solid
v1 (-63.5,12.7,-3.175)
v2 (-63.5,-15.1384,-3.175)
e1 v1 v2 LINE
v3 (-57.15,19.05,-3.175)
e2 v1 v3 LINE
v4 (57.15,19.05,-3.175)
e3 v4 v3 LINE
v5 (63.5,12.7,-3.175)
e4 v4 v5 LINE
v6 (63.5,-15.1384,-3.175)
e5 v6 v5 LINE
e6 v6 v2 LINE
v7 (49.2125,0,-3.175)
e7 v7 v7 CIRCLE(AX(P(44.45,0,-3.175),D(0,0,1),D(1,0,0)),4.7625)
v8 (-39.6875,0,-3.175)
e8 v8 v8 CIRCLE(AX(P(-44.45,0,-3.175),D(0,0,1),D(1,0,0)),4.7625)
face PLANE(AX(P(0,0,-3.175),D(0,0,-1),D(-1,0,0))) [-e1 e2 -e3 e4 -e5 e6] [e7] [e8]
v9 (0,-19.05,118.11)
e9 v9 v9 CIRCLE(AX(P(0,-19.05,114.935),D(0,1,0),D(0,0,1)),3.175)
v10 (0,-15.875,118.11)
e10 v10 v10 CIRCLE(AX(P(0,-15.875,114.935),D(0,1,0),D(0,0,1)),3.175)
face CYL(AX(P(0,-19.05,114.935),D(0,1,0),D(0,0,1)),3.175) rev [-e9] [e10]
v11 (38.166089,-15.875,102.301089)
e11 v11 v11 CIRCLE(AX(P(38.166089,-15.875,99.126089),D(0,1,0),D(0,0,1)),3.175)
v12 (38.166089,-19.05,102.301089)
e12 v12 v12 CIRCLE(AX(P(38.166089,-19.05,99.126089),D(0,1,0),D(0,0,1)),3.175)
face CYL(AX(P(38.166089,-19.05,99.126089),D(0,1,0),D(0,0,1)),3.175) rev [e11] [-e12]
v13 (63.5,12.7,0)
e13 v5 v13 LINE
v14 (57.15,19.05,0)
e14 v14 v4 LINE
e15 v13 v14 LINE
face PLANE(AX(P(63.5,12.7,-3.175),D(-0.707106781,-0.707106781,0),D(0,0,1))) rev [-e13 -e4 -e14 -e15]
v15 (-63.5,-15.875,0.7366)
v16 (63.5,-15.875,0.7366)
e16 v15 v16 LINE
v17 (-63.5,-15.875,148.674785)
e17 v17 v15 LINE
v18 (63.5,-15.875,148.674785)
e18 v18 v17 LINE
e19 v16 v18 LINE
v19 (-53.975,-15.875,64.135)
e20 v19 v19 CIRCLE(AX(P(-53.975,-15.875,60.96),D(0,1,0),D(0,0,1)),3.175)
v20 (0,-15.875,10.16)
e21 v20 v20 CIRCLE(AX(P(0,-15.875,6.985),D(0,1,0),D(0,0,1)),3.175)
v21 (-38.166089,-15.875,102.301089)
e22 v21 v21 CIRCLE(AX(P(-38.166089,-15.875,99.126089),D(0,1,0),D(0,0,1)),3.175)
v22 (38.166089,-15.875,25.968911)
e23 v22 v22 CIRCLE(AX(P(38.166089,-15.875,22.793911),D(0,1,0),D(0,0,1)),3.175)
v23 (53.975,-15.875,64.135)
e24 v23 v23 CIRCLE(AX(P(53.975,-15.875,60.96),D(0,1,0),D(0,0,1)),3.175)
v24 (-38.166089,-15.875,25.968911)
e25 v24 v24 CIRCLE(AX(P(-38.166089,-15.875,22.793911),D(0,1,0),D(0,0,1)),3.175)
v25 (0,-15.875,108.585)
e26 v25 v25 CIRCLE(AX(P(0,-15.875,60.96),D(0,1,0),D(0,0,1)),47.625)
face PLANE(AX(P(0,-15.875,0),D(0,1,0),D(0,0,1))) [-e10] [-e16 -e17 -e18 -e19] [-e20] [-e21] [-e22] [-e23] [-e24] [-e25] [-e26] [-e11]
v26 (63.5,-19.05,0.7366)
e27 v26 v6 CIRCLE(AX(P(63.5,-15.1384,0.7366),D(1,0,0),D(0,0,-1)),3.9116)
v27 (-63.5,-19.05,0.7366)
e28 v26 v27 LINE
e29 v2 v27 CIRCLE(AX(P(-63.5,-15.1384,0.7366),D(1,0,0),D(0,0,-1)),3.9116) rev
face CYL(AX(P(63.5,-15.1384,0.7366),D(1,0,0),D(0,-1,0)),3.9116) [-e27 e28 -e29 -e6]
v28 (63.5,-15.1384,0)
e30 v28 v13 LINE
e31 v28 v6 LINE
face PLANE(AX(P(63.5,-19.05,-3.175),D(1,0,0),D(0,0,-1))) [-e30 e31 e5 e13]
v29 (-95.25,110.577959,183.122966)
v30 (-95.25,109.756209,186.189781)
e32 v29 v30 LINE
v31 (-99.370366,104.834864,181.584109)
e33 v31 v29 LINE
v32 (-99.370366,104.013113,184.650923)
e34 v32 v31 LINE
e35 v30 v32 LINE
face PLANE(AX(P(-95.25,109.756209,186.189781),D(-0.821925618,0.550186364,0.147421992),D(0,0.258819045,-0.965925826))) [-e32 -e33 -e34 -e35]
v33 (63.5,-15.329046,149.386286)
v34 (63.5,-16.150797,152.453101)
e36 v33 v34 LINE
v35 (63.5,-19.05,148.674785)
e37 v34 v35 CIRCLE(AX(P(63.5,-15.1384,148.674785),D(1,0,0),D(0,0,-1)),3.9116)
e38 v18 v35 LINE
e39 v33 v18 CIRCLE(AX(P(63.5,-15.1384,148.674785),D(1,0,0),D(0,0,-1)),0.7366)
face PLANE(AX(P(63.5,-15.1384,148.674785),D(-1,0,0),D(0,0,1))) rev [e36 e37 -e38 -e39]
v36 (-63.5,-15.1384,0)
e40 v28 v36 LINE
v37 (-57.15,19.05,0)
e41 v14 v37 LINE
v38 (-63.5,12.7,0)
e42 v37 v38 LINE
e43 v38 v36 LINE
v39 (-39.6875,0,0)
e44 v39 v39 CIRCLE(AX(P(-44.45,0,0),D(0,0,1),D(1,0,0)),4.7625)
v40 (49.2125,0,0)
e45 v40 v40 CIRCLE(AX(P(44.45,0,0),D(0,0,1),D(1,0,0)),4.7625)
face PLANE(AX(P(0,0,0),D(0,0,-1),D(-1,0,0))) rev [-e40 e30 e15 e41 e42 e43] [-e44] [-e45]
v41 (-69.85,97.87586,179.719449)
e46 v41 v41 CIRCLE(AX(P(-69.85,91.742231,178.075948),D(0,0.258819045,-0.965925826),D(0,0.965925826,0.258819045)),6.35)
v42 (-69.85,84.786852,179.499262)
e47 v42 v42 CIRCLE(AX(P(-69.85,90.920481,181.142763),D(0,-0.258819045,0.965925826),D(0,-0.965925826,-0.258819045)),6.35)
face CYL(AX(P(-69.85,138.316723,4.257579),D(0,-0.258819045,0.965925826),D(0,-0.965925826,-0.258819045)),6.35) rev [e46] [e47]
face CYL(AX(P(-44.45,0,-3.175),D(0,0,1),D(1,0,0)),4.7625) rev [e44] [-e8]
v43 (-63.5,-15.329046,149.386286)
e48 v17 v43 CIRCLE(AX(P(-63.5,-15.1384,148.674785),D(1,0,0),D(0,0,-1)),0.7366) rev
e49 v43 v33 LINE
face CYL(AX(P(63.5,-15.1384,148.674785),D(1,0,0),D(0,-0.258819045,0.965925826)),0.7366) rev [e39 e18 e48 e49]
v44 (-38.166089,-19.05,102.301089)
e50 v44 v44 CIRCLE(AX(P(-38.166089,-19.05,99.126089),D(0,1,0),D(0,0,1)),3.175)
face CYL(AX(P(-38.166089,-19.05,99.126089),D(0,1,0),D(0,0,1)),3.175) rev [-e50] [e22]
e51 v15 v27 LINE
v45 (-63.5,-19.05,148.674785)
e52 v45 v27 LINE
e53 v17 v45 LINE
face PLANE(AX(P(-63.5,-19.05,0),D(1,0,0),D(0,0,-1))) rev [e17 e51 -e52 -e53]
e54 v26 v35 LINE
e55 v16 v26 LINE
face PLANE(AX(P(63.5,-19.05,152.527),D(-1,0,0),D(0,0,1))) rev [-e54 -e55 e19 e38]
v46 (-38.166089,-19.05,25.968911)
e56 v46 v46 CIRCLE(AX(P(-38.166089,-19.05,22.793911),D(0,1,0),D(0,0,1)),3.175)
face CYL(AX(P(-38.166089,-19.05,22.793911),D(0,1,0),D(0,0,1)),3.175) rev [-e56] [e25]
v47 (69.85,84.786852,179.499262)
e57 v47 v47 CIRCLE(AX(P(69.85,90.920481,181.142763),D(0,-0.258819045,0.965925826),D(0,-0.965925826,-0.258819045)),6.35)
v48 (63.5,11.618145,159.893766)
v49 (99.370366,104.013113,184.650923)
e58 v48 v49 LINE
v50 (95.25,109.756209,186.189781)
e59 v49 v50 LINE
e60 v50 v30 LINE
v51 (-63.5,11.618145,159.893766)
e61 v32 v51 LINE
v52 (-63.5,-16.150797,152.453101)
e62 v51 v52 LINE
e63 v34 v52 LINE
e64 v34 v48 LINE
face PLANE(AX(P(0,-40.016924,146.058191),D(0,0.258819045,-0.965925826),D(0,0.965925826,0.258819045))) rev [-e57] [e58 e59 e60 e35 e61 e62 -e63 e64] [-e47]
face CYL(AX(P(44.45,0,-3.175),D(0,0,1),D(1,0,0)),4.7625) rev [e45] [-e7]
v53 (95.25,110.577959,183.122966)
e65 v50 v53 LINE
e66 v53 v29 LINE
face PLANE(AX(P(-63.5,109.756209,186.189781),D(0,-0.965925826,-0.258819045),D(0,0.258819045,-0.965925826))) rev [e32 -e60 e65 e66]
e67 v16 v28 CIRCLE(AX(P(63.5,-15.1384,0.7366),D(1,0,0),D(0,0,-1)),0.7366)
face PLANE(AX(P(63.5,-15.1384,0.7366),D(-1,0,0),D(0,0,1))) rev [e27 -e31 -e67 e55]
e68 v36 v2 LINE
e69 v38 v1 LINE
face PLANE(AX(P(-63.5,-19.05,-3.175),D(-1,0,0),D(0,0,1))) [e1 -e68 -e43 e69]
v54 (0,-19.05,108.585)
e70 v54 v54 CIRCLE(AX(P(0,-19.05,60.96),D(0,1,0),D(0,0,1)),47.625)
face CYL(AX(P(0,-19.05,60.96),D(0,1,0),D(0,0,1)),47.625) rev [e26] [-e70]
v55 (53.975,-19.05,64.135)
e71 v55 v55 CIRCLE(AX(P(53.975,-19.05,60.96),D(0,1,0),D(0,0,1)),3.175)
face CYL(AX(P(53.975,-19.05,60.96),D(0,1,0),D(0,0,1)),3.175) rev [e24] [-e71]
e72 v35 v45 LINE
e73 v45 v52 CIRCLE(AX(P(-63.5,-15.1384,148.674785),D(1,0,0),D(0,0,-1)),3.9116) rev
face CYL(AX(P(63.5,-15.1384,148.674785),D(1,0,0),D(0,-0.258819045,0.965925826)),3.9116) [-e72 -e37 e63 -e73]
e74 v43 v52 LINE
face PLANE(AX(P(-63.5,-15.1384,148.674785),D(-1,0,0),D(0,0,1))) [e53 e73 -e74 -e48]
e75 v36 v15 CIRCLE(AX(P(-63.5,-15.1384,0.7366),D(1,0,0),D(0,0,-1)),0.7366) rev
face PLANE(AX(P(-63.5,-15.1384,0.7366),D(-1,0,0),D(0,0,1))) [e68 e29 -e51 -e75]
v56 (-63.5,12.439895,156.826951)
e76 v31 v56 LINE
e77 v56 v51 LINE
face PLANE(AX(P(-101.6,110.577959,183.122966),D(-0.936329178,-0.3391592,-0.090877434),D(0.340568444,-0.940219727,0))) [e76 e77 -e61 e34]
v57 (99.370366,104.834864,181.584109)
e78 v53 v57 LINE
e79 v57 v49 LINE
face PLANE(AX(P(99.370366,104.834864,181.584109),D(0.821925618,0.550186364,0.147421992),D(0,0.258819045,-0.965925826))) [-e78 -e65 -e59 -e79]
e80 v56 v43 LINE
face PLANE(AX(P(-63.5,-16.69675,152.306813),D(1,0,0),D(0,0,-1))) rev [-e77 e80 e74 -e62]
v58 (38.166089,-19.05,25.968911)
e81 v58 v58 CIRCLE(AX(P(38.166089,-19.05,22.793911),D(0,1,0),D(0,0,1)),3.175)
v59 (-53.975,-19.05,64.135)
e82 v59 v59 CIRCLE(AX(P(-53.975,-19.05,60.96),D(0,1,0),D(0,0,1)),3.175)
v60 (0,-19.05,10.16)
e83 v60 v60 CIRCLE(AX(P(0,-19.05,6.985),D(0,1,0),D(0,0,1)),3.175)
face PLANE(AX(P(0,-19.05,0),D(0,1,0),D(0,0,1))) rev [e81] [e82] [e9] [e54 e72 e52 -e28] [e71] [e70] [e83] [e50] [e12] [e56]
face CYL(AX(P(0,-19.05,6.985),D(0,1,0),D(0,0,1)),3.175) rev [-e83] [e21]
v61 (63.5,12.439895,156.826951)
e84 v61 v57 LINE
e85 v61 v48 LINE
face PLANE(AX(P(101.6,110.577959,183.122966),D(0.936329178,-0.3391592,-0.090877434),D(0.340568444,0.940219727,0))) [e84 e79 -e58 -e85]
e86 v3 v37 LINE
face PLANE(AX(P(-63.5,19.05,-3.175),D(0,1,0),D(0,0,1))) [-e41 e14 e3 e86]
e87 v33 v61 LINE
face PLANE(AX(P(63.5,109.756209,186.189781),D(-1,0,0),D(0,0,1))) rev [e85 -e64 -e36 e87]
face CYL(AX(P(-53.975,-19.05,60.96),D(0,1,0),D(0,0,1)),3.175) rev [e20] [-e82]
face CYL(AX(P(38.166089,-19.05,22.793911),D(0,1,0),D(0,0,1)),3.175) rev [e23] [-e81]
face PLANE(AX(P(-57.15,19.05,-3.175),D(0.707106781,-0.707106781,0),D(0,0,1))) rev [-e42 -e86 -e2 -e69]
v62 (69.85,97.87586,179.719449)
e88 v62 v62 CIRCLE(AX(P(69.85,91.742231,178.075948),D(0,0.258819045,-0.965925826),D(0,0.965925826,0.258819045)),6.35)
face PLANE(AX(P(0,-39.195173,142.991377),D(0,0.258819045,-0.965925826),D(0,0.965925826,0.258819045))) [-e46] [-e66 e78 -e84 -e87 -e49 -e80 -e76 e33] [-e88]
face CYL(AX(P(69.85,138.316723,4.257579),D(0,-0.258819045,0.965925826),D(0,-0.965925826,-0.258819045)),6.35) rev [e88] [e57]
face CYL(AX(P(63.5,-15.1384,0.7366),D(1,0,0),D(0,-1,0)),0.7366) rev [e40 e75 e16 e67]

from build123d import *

# Parameters (mm, degrees)
SKETCH1_W                    = 127
SKETCH1_H                    = 38.1
BASE_FLANGE1_DEPTH           = 3.175
EDGE_FLANGE1_STRIP_W         = 14.1732
EDGE_FLANGE1_STRIP_H         = 3.175
EDGE_FLANGE1_STRIP_CUT_DEPTH = 127
EDGE_FLANGE1_DEPTH           = 127
SKETCH9_R                    = 3.175
SKETCH9_R_2                  = 47.625
CUT_EXTRUDE1_DEPTH           = 169.868266273
EDGE_FLANGE2_START           = -63.5
EDGE_FLANGE2_DEPTH           = 127
EDGE_FLANGE2_2_DEPTH         = 127
TAB1_DEPTH                   = 3.175
SKETCH16_R                   = 6.35
CUT_EXTRUDE2_DEPTH           = 235.714429908
BREAK_CORNER1_START          = -171.342480702
BREAK_CORNER1_OUTLINE_W      = 10
BREAK_CORNER1_OUTLINE_H      = 6
BREAK_CORNER1_DEPTH          = 5.219227672
BREAK_CORNER1_START_2        = 166.12325303
BREAK_CORNER1_2_OUTLINE_W    = 10
BREAK_CORNER1_2_OUTLINE_H    = 6
BREAK_CORNER1_2_DEPTH        = 5.219227672
BREAK_CORNER1_START_3        = 53.881536726
BREAK_CORNER1_3_OUTLINE_W    = 12
BREAK_CORNER1_3_OUTLINE_H    = 6
BREAK_CORNER1_3_DEPTH        = 4.490128061
BREAK_CORNER1_START_4        = -58.371664787
BREAK_CORNER1_4_OUTLINE_W    = 12
BREAK_CORNER1_4_OUTLINE_H    = 6
BREAK_CORNER1_4_DEPTH        = 4.490128061
SKETCH17_R                   = 4.7625
CUT_EXTRUDE3_DEPTH           = 239.261598489


# Read off the part's stored shape, not the designer's step: Edge-Flange2, Break-Corner1
# Sheet-metal steps are written as plain solids
with BuildPart() as part:
    # Sketch1 → Base-Flange1 (new body)
    with BuildSketch(Plane.XY):
        Rectangle(SKETCH1_W, SKETCH1_H)
    extrude(amount=-BASE_FLANGE1_DEPTH)

    # Edge-Flange1 strip (across the edge) → Edge-Flange1 strip cut (cut)
    with BuildSketch(Plane(origin=(-63.5, -19.05, 0), x_dir=(0, 1, 0), z_dir=(1, 0, 0))):
        with Locations((-3.175, -1.5875)):
            Rectangle(EDGE_FLANGE1_STRIP_W, EDGE_FLANGE1_STRIP_H)
    extrude(amount=EDGE_FLANGE1_STRIP_CUT_DEPTH, mode=Mode.SUBTRACT)

    # Edge-Flange1 section (across the edge) → Edge-Flange1 (add)
    with BuildSketch(Plane(origin=(-63.5, -19.05, 0), x_dir=(0, 1, 0), z_dir=(1, 0, 0))):
        with BuildLine():
            Line((0, 0.7366), (0, 152.527))
            Line((0, 152.527), (3.175, 152.527))
            Line((3.175, 152.527), (3.175, 0.7366))
            ThreePointArc((3.175, 0.7366), (3.390745145, 0.215745145), (3.9116, 0))
            Line((3.9116, 0), (3.9116, -3.175))
            ThreePointArc((3.9116, -3.175), (1.145681115, -2.029318885), (0, 0.7366))
        make_face()
    extrude(amount=EDGE_FLANGE1_DEPTH)

    # Sketch9 → Cut-Extrude1 (cut, through all)
    with BuildSketch(Plane(origin=(0, -15.875, 0), x_dir=(1, 0, 0), z_dir=(0, 1, 0))):
        with Locations(Location((0, -6.985, 0), (0, 0, 270))):
            Circle(SKETCH9_R)
        with Locations(Location((38.166088515, -22.793911485, 0), (0, 0, 270))):
            Circle(SKETCH9_R)
        with Locations(Location((53.975, -60.96, 0), (0, 0, 270))):
            Circle(SKETCH9_R)
        with Locations(Location((38.166088515, -99.126088515, 0), (0, 0, 270))):
            Circle(SKETCH9_R)
        with Locations(Location((0, -114.935, 0), (0, 0, 270))):
            Circle(SKETCH9_R)
        with Locations(Location((-38.166088515, -99.126088515, 0), (0, 0, 270))):
            Circle(SKETCH9_R)
        with Locations(Location((-53.975, -60.96, 0), (0, 0, 270))):
            Circle(SKETCH9_R)
        with Locations(Location((-38.166088515, -22.793911485, 0), (0, 0, 270))):
            Circle(SKETCH9_R)
        with Locations(Location((0, -60.96, 0), (0, 0, 270))):
            Circle(SKETCH9_R_2)
    extrude(amount=-CUT_EXTRUDE1_DEPTH, mode=Mode.SUBTRACT)

    # Edge-Flange2 outline → Edge-Flange2 (cut)
    with BuildSketch(Plane.YZ.offset(EDGE_FLANGE2_START)):
        with BuildLine():
            ThreePointArc((-19.05, 148.674785068), (-18.241680926, 151.056016274), (-16.150796577, 152.45310053))
            Line((-16.150796577, 152.45310053), (-15.875, 152.527))
            Line((-15.875, 152.527), (-19.05, 152.527))
            Line((-19.05, 152.527), (-19.05, 148.674785068))
        make_face()
    extrude(amount=EDGE_FLANGE2_DEPTH, mode=Mode.SUBTRACT)

    # Edge-Flange2 2 outline → Edge-Flange2 2 (add)
    with BuildSketch(Plane.YZ.offset(EDGE_FLANGE2_START)):
        with BuildLine():
            Line((109.756208936, 186.189780978), (-15.875, 152.527))
            Line((-15.875, 152.527), (-15.875, 148.674785068))
            ThreePointArc((-15.875, 148.674785068), (-15.72278407, 149.123198736), (-15.329046109, 149.386286031))
            Line((-15.329046109, 149.386286031), (110.577959404, 183.12296648))
            Line((110.577959404, 183.12296648), (109.756208936, 186.189780978))
        make_face()
    extrude(amount=EDGE_FLANGE2_2_DEPTH)

    # Sketch13 → Tab1 (add)
    with BuildSketch(Plane(origin=(0, -39.195173357, 146.278378382), x_dir=(1, 0, 0), z_dir=(0, -0.258819045102528, 0.9659258262890663))):
        Polygon((-63.5, 154.205818127), (-101.6, 154.205818127), (-63.5, 52.605818127), align=None)
        Polygon((101.6, 154.205818127), (63.5, 52.605818127), (63.5, 154.205818127), align=None)
    extrude(amount=-TAB1_DEPTH)

    # Sketch16 → Cut-Extrude2 (cut, through all)
    with BuildSketch(Plane(origin=(0, -39.195173357, 146.278378382), x_dir=(1, 0, 0), z_dir=(0, -0.258819045102528, 0.9659258262890663))):
        with Locations(Location((69.85, 134.705637142, 0), (0, 0, 270))):
            Circle(SKETCH16_R)
        with Locations(Location((-69.85, 134.705637142, 0), (0, 0, 270))):
            Circle(SKETCH16_R)
    extrude(amount=-CUT_EXTRUDE2_DEPTH, mode=Mode.SUBTRACT)

    # Break-Corner1 outline → Break-Corner1 (cut)
    with BuildSketch(Plane(origin=(0, 0, 0), x_dir=(0.5695948377626004, 0.7939191812855688, 0.212730003481053), z_dir=(0.8219256175556257, -0.5501863643158269, -0.14742199200504597)).offset(BREAK_CORNER1_START)):
        with Locations((69, 150)):
            Rectangle(BREAK_CORNER1_OUTLINE_W, BREAK_CORNER1_OUTLINE_H)
    extrude(amount=BREAK_CORNER1_DEPTH, mode=Mode.SUBTRACT)

    # Break-Corner1 2 outline → Break-Corner1 2 (cut)
    with BuildSketch(Plane(origin=(0, 0, 0), x_dir=(0.5695948377626027, -0.7939191812855675, -0.21273000348105187), z_dir=(0.8219256175556241, 0.5501863643158292, 0.14742199200504602)).offset(BREAK_CORNER1_START_2)):
        with Locations((-69, -150)):
            Rectangle(BREAK_CORNER1_2_OUTLINE_W, BREAK_CORNER1_2_OUTLINE_H)
    extrude(amount=BREAK_CORNER1_2_DEPTH, mode=Mode.SUBTRACT)

    # Break-Corner1 3 outline → Break-Corner1 3 (cut)
    with BuildSketch(Plane(origin=(0, 0, 0), x_dir=(0.707106781186548, -0.707106781186547, 0), z_dir=(0.707106781186547, 0.707106781186548, 0)).offset(BREAK_CORNER1_START_3)):
        with Locations((31, 2)):
            Rectangle(BREAK_CORNER1_3_OUTLINE_W, BREAK_CORNER1_3_OUTLINE_H)
    extrude(amount=BREAK_CORNER1_3_DEPTH, mode=Mode.SUBTRACT)

    # Break-Corner1 4 outline → Break-Corner1 4 (cut)
    with BuildSketch(Plane(origin=(0, 0, 0), x_dir=(0.7071067811865474, 0.7071067811865477, 0), z_dir=(0.7071067811865476, -0.7071067811865476, 0)).offset(BREAK_CORNER1_START_4)):
        with Locations((-31, -2)):
            Rectangle(BREAK_CORNER1_4_OUTLINE_W, BREAK_CORNER1_4_OUTLINE_H)
    extrude(amount=BREAK_CORNER1_4_DEPTH, mode=Mode.SUBTRACT)

    # Sketch17 → Cut-Extrude3 (cut, through all)
    with BuildSketch(Plane.XY):
        with Locations((44.45, 0)):
            Circle(SKETCH17_R)
        with Locations((-44.45, 0)):
            Circle(SKETCH17_R)
    extrude(amount=-CUT_EXTRUDE3_DEPTH, mode=Mode.SUBTRACT)


solid = part.part
